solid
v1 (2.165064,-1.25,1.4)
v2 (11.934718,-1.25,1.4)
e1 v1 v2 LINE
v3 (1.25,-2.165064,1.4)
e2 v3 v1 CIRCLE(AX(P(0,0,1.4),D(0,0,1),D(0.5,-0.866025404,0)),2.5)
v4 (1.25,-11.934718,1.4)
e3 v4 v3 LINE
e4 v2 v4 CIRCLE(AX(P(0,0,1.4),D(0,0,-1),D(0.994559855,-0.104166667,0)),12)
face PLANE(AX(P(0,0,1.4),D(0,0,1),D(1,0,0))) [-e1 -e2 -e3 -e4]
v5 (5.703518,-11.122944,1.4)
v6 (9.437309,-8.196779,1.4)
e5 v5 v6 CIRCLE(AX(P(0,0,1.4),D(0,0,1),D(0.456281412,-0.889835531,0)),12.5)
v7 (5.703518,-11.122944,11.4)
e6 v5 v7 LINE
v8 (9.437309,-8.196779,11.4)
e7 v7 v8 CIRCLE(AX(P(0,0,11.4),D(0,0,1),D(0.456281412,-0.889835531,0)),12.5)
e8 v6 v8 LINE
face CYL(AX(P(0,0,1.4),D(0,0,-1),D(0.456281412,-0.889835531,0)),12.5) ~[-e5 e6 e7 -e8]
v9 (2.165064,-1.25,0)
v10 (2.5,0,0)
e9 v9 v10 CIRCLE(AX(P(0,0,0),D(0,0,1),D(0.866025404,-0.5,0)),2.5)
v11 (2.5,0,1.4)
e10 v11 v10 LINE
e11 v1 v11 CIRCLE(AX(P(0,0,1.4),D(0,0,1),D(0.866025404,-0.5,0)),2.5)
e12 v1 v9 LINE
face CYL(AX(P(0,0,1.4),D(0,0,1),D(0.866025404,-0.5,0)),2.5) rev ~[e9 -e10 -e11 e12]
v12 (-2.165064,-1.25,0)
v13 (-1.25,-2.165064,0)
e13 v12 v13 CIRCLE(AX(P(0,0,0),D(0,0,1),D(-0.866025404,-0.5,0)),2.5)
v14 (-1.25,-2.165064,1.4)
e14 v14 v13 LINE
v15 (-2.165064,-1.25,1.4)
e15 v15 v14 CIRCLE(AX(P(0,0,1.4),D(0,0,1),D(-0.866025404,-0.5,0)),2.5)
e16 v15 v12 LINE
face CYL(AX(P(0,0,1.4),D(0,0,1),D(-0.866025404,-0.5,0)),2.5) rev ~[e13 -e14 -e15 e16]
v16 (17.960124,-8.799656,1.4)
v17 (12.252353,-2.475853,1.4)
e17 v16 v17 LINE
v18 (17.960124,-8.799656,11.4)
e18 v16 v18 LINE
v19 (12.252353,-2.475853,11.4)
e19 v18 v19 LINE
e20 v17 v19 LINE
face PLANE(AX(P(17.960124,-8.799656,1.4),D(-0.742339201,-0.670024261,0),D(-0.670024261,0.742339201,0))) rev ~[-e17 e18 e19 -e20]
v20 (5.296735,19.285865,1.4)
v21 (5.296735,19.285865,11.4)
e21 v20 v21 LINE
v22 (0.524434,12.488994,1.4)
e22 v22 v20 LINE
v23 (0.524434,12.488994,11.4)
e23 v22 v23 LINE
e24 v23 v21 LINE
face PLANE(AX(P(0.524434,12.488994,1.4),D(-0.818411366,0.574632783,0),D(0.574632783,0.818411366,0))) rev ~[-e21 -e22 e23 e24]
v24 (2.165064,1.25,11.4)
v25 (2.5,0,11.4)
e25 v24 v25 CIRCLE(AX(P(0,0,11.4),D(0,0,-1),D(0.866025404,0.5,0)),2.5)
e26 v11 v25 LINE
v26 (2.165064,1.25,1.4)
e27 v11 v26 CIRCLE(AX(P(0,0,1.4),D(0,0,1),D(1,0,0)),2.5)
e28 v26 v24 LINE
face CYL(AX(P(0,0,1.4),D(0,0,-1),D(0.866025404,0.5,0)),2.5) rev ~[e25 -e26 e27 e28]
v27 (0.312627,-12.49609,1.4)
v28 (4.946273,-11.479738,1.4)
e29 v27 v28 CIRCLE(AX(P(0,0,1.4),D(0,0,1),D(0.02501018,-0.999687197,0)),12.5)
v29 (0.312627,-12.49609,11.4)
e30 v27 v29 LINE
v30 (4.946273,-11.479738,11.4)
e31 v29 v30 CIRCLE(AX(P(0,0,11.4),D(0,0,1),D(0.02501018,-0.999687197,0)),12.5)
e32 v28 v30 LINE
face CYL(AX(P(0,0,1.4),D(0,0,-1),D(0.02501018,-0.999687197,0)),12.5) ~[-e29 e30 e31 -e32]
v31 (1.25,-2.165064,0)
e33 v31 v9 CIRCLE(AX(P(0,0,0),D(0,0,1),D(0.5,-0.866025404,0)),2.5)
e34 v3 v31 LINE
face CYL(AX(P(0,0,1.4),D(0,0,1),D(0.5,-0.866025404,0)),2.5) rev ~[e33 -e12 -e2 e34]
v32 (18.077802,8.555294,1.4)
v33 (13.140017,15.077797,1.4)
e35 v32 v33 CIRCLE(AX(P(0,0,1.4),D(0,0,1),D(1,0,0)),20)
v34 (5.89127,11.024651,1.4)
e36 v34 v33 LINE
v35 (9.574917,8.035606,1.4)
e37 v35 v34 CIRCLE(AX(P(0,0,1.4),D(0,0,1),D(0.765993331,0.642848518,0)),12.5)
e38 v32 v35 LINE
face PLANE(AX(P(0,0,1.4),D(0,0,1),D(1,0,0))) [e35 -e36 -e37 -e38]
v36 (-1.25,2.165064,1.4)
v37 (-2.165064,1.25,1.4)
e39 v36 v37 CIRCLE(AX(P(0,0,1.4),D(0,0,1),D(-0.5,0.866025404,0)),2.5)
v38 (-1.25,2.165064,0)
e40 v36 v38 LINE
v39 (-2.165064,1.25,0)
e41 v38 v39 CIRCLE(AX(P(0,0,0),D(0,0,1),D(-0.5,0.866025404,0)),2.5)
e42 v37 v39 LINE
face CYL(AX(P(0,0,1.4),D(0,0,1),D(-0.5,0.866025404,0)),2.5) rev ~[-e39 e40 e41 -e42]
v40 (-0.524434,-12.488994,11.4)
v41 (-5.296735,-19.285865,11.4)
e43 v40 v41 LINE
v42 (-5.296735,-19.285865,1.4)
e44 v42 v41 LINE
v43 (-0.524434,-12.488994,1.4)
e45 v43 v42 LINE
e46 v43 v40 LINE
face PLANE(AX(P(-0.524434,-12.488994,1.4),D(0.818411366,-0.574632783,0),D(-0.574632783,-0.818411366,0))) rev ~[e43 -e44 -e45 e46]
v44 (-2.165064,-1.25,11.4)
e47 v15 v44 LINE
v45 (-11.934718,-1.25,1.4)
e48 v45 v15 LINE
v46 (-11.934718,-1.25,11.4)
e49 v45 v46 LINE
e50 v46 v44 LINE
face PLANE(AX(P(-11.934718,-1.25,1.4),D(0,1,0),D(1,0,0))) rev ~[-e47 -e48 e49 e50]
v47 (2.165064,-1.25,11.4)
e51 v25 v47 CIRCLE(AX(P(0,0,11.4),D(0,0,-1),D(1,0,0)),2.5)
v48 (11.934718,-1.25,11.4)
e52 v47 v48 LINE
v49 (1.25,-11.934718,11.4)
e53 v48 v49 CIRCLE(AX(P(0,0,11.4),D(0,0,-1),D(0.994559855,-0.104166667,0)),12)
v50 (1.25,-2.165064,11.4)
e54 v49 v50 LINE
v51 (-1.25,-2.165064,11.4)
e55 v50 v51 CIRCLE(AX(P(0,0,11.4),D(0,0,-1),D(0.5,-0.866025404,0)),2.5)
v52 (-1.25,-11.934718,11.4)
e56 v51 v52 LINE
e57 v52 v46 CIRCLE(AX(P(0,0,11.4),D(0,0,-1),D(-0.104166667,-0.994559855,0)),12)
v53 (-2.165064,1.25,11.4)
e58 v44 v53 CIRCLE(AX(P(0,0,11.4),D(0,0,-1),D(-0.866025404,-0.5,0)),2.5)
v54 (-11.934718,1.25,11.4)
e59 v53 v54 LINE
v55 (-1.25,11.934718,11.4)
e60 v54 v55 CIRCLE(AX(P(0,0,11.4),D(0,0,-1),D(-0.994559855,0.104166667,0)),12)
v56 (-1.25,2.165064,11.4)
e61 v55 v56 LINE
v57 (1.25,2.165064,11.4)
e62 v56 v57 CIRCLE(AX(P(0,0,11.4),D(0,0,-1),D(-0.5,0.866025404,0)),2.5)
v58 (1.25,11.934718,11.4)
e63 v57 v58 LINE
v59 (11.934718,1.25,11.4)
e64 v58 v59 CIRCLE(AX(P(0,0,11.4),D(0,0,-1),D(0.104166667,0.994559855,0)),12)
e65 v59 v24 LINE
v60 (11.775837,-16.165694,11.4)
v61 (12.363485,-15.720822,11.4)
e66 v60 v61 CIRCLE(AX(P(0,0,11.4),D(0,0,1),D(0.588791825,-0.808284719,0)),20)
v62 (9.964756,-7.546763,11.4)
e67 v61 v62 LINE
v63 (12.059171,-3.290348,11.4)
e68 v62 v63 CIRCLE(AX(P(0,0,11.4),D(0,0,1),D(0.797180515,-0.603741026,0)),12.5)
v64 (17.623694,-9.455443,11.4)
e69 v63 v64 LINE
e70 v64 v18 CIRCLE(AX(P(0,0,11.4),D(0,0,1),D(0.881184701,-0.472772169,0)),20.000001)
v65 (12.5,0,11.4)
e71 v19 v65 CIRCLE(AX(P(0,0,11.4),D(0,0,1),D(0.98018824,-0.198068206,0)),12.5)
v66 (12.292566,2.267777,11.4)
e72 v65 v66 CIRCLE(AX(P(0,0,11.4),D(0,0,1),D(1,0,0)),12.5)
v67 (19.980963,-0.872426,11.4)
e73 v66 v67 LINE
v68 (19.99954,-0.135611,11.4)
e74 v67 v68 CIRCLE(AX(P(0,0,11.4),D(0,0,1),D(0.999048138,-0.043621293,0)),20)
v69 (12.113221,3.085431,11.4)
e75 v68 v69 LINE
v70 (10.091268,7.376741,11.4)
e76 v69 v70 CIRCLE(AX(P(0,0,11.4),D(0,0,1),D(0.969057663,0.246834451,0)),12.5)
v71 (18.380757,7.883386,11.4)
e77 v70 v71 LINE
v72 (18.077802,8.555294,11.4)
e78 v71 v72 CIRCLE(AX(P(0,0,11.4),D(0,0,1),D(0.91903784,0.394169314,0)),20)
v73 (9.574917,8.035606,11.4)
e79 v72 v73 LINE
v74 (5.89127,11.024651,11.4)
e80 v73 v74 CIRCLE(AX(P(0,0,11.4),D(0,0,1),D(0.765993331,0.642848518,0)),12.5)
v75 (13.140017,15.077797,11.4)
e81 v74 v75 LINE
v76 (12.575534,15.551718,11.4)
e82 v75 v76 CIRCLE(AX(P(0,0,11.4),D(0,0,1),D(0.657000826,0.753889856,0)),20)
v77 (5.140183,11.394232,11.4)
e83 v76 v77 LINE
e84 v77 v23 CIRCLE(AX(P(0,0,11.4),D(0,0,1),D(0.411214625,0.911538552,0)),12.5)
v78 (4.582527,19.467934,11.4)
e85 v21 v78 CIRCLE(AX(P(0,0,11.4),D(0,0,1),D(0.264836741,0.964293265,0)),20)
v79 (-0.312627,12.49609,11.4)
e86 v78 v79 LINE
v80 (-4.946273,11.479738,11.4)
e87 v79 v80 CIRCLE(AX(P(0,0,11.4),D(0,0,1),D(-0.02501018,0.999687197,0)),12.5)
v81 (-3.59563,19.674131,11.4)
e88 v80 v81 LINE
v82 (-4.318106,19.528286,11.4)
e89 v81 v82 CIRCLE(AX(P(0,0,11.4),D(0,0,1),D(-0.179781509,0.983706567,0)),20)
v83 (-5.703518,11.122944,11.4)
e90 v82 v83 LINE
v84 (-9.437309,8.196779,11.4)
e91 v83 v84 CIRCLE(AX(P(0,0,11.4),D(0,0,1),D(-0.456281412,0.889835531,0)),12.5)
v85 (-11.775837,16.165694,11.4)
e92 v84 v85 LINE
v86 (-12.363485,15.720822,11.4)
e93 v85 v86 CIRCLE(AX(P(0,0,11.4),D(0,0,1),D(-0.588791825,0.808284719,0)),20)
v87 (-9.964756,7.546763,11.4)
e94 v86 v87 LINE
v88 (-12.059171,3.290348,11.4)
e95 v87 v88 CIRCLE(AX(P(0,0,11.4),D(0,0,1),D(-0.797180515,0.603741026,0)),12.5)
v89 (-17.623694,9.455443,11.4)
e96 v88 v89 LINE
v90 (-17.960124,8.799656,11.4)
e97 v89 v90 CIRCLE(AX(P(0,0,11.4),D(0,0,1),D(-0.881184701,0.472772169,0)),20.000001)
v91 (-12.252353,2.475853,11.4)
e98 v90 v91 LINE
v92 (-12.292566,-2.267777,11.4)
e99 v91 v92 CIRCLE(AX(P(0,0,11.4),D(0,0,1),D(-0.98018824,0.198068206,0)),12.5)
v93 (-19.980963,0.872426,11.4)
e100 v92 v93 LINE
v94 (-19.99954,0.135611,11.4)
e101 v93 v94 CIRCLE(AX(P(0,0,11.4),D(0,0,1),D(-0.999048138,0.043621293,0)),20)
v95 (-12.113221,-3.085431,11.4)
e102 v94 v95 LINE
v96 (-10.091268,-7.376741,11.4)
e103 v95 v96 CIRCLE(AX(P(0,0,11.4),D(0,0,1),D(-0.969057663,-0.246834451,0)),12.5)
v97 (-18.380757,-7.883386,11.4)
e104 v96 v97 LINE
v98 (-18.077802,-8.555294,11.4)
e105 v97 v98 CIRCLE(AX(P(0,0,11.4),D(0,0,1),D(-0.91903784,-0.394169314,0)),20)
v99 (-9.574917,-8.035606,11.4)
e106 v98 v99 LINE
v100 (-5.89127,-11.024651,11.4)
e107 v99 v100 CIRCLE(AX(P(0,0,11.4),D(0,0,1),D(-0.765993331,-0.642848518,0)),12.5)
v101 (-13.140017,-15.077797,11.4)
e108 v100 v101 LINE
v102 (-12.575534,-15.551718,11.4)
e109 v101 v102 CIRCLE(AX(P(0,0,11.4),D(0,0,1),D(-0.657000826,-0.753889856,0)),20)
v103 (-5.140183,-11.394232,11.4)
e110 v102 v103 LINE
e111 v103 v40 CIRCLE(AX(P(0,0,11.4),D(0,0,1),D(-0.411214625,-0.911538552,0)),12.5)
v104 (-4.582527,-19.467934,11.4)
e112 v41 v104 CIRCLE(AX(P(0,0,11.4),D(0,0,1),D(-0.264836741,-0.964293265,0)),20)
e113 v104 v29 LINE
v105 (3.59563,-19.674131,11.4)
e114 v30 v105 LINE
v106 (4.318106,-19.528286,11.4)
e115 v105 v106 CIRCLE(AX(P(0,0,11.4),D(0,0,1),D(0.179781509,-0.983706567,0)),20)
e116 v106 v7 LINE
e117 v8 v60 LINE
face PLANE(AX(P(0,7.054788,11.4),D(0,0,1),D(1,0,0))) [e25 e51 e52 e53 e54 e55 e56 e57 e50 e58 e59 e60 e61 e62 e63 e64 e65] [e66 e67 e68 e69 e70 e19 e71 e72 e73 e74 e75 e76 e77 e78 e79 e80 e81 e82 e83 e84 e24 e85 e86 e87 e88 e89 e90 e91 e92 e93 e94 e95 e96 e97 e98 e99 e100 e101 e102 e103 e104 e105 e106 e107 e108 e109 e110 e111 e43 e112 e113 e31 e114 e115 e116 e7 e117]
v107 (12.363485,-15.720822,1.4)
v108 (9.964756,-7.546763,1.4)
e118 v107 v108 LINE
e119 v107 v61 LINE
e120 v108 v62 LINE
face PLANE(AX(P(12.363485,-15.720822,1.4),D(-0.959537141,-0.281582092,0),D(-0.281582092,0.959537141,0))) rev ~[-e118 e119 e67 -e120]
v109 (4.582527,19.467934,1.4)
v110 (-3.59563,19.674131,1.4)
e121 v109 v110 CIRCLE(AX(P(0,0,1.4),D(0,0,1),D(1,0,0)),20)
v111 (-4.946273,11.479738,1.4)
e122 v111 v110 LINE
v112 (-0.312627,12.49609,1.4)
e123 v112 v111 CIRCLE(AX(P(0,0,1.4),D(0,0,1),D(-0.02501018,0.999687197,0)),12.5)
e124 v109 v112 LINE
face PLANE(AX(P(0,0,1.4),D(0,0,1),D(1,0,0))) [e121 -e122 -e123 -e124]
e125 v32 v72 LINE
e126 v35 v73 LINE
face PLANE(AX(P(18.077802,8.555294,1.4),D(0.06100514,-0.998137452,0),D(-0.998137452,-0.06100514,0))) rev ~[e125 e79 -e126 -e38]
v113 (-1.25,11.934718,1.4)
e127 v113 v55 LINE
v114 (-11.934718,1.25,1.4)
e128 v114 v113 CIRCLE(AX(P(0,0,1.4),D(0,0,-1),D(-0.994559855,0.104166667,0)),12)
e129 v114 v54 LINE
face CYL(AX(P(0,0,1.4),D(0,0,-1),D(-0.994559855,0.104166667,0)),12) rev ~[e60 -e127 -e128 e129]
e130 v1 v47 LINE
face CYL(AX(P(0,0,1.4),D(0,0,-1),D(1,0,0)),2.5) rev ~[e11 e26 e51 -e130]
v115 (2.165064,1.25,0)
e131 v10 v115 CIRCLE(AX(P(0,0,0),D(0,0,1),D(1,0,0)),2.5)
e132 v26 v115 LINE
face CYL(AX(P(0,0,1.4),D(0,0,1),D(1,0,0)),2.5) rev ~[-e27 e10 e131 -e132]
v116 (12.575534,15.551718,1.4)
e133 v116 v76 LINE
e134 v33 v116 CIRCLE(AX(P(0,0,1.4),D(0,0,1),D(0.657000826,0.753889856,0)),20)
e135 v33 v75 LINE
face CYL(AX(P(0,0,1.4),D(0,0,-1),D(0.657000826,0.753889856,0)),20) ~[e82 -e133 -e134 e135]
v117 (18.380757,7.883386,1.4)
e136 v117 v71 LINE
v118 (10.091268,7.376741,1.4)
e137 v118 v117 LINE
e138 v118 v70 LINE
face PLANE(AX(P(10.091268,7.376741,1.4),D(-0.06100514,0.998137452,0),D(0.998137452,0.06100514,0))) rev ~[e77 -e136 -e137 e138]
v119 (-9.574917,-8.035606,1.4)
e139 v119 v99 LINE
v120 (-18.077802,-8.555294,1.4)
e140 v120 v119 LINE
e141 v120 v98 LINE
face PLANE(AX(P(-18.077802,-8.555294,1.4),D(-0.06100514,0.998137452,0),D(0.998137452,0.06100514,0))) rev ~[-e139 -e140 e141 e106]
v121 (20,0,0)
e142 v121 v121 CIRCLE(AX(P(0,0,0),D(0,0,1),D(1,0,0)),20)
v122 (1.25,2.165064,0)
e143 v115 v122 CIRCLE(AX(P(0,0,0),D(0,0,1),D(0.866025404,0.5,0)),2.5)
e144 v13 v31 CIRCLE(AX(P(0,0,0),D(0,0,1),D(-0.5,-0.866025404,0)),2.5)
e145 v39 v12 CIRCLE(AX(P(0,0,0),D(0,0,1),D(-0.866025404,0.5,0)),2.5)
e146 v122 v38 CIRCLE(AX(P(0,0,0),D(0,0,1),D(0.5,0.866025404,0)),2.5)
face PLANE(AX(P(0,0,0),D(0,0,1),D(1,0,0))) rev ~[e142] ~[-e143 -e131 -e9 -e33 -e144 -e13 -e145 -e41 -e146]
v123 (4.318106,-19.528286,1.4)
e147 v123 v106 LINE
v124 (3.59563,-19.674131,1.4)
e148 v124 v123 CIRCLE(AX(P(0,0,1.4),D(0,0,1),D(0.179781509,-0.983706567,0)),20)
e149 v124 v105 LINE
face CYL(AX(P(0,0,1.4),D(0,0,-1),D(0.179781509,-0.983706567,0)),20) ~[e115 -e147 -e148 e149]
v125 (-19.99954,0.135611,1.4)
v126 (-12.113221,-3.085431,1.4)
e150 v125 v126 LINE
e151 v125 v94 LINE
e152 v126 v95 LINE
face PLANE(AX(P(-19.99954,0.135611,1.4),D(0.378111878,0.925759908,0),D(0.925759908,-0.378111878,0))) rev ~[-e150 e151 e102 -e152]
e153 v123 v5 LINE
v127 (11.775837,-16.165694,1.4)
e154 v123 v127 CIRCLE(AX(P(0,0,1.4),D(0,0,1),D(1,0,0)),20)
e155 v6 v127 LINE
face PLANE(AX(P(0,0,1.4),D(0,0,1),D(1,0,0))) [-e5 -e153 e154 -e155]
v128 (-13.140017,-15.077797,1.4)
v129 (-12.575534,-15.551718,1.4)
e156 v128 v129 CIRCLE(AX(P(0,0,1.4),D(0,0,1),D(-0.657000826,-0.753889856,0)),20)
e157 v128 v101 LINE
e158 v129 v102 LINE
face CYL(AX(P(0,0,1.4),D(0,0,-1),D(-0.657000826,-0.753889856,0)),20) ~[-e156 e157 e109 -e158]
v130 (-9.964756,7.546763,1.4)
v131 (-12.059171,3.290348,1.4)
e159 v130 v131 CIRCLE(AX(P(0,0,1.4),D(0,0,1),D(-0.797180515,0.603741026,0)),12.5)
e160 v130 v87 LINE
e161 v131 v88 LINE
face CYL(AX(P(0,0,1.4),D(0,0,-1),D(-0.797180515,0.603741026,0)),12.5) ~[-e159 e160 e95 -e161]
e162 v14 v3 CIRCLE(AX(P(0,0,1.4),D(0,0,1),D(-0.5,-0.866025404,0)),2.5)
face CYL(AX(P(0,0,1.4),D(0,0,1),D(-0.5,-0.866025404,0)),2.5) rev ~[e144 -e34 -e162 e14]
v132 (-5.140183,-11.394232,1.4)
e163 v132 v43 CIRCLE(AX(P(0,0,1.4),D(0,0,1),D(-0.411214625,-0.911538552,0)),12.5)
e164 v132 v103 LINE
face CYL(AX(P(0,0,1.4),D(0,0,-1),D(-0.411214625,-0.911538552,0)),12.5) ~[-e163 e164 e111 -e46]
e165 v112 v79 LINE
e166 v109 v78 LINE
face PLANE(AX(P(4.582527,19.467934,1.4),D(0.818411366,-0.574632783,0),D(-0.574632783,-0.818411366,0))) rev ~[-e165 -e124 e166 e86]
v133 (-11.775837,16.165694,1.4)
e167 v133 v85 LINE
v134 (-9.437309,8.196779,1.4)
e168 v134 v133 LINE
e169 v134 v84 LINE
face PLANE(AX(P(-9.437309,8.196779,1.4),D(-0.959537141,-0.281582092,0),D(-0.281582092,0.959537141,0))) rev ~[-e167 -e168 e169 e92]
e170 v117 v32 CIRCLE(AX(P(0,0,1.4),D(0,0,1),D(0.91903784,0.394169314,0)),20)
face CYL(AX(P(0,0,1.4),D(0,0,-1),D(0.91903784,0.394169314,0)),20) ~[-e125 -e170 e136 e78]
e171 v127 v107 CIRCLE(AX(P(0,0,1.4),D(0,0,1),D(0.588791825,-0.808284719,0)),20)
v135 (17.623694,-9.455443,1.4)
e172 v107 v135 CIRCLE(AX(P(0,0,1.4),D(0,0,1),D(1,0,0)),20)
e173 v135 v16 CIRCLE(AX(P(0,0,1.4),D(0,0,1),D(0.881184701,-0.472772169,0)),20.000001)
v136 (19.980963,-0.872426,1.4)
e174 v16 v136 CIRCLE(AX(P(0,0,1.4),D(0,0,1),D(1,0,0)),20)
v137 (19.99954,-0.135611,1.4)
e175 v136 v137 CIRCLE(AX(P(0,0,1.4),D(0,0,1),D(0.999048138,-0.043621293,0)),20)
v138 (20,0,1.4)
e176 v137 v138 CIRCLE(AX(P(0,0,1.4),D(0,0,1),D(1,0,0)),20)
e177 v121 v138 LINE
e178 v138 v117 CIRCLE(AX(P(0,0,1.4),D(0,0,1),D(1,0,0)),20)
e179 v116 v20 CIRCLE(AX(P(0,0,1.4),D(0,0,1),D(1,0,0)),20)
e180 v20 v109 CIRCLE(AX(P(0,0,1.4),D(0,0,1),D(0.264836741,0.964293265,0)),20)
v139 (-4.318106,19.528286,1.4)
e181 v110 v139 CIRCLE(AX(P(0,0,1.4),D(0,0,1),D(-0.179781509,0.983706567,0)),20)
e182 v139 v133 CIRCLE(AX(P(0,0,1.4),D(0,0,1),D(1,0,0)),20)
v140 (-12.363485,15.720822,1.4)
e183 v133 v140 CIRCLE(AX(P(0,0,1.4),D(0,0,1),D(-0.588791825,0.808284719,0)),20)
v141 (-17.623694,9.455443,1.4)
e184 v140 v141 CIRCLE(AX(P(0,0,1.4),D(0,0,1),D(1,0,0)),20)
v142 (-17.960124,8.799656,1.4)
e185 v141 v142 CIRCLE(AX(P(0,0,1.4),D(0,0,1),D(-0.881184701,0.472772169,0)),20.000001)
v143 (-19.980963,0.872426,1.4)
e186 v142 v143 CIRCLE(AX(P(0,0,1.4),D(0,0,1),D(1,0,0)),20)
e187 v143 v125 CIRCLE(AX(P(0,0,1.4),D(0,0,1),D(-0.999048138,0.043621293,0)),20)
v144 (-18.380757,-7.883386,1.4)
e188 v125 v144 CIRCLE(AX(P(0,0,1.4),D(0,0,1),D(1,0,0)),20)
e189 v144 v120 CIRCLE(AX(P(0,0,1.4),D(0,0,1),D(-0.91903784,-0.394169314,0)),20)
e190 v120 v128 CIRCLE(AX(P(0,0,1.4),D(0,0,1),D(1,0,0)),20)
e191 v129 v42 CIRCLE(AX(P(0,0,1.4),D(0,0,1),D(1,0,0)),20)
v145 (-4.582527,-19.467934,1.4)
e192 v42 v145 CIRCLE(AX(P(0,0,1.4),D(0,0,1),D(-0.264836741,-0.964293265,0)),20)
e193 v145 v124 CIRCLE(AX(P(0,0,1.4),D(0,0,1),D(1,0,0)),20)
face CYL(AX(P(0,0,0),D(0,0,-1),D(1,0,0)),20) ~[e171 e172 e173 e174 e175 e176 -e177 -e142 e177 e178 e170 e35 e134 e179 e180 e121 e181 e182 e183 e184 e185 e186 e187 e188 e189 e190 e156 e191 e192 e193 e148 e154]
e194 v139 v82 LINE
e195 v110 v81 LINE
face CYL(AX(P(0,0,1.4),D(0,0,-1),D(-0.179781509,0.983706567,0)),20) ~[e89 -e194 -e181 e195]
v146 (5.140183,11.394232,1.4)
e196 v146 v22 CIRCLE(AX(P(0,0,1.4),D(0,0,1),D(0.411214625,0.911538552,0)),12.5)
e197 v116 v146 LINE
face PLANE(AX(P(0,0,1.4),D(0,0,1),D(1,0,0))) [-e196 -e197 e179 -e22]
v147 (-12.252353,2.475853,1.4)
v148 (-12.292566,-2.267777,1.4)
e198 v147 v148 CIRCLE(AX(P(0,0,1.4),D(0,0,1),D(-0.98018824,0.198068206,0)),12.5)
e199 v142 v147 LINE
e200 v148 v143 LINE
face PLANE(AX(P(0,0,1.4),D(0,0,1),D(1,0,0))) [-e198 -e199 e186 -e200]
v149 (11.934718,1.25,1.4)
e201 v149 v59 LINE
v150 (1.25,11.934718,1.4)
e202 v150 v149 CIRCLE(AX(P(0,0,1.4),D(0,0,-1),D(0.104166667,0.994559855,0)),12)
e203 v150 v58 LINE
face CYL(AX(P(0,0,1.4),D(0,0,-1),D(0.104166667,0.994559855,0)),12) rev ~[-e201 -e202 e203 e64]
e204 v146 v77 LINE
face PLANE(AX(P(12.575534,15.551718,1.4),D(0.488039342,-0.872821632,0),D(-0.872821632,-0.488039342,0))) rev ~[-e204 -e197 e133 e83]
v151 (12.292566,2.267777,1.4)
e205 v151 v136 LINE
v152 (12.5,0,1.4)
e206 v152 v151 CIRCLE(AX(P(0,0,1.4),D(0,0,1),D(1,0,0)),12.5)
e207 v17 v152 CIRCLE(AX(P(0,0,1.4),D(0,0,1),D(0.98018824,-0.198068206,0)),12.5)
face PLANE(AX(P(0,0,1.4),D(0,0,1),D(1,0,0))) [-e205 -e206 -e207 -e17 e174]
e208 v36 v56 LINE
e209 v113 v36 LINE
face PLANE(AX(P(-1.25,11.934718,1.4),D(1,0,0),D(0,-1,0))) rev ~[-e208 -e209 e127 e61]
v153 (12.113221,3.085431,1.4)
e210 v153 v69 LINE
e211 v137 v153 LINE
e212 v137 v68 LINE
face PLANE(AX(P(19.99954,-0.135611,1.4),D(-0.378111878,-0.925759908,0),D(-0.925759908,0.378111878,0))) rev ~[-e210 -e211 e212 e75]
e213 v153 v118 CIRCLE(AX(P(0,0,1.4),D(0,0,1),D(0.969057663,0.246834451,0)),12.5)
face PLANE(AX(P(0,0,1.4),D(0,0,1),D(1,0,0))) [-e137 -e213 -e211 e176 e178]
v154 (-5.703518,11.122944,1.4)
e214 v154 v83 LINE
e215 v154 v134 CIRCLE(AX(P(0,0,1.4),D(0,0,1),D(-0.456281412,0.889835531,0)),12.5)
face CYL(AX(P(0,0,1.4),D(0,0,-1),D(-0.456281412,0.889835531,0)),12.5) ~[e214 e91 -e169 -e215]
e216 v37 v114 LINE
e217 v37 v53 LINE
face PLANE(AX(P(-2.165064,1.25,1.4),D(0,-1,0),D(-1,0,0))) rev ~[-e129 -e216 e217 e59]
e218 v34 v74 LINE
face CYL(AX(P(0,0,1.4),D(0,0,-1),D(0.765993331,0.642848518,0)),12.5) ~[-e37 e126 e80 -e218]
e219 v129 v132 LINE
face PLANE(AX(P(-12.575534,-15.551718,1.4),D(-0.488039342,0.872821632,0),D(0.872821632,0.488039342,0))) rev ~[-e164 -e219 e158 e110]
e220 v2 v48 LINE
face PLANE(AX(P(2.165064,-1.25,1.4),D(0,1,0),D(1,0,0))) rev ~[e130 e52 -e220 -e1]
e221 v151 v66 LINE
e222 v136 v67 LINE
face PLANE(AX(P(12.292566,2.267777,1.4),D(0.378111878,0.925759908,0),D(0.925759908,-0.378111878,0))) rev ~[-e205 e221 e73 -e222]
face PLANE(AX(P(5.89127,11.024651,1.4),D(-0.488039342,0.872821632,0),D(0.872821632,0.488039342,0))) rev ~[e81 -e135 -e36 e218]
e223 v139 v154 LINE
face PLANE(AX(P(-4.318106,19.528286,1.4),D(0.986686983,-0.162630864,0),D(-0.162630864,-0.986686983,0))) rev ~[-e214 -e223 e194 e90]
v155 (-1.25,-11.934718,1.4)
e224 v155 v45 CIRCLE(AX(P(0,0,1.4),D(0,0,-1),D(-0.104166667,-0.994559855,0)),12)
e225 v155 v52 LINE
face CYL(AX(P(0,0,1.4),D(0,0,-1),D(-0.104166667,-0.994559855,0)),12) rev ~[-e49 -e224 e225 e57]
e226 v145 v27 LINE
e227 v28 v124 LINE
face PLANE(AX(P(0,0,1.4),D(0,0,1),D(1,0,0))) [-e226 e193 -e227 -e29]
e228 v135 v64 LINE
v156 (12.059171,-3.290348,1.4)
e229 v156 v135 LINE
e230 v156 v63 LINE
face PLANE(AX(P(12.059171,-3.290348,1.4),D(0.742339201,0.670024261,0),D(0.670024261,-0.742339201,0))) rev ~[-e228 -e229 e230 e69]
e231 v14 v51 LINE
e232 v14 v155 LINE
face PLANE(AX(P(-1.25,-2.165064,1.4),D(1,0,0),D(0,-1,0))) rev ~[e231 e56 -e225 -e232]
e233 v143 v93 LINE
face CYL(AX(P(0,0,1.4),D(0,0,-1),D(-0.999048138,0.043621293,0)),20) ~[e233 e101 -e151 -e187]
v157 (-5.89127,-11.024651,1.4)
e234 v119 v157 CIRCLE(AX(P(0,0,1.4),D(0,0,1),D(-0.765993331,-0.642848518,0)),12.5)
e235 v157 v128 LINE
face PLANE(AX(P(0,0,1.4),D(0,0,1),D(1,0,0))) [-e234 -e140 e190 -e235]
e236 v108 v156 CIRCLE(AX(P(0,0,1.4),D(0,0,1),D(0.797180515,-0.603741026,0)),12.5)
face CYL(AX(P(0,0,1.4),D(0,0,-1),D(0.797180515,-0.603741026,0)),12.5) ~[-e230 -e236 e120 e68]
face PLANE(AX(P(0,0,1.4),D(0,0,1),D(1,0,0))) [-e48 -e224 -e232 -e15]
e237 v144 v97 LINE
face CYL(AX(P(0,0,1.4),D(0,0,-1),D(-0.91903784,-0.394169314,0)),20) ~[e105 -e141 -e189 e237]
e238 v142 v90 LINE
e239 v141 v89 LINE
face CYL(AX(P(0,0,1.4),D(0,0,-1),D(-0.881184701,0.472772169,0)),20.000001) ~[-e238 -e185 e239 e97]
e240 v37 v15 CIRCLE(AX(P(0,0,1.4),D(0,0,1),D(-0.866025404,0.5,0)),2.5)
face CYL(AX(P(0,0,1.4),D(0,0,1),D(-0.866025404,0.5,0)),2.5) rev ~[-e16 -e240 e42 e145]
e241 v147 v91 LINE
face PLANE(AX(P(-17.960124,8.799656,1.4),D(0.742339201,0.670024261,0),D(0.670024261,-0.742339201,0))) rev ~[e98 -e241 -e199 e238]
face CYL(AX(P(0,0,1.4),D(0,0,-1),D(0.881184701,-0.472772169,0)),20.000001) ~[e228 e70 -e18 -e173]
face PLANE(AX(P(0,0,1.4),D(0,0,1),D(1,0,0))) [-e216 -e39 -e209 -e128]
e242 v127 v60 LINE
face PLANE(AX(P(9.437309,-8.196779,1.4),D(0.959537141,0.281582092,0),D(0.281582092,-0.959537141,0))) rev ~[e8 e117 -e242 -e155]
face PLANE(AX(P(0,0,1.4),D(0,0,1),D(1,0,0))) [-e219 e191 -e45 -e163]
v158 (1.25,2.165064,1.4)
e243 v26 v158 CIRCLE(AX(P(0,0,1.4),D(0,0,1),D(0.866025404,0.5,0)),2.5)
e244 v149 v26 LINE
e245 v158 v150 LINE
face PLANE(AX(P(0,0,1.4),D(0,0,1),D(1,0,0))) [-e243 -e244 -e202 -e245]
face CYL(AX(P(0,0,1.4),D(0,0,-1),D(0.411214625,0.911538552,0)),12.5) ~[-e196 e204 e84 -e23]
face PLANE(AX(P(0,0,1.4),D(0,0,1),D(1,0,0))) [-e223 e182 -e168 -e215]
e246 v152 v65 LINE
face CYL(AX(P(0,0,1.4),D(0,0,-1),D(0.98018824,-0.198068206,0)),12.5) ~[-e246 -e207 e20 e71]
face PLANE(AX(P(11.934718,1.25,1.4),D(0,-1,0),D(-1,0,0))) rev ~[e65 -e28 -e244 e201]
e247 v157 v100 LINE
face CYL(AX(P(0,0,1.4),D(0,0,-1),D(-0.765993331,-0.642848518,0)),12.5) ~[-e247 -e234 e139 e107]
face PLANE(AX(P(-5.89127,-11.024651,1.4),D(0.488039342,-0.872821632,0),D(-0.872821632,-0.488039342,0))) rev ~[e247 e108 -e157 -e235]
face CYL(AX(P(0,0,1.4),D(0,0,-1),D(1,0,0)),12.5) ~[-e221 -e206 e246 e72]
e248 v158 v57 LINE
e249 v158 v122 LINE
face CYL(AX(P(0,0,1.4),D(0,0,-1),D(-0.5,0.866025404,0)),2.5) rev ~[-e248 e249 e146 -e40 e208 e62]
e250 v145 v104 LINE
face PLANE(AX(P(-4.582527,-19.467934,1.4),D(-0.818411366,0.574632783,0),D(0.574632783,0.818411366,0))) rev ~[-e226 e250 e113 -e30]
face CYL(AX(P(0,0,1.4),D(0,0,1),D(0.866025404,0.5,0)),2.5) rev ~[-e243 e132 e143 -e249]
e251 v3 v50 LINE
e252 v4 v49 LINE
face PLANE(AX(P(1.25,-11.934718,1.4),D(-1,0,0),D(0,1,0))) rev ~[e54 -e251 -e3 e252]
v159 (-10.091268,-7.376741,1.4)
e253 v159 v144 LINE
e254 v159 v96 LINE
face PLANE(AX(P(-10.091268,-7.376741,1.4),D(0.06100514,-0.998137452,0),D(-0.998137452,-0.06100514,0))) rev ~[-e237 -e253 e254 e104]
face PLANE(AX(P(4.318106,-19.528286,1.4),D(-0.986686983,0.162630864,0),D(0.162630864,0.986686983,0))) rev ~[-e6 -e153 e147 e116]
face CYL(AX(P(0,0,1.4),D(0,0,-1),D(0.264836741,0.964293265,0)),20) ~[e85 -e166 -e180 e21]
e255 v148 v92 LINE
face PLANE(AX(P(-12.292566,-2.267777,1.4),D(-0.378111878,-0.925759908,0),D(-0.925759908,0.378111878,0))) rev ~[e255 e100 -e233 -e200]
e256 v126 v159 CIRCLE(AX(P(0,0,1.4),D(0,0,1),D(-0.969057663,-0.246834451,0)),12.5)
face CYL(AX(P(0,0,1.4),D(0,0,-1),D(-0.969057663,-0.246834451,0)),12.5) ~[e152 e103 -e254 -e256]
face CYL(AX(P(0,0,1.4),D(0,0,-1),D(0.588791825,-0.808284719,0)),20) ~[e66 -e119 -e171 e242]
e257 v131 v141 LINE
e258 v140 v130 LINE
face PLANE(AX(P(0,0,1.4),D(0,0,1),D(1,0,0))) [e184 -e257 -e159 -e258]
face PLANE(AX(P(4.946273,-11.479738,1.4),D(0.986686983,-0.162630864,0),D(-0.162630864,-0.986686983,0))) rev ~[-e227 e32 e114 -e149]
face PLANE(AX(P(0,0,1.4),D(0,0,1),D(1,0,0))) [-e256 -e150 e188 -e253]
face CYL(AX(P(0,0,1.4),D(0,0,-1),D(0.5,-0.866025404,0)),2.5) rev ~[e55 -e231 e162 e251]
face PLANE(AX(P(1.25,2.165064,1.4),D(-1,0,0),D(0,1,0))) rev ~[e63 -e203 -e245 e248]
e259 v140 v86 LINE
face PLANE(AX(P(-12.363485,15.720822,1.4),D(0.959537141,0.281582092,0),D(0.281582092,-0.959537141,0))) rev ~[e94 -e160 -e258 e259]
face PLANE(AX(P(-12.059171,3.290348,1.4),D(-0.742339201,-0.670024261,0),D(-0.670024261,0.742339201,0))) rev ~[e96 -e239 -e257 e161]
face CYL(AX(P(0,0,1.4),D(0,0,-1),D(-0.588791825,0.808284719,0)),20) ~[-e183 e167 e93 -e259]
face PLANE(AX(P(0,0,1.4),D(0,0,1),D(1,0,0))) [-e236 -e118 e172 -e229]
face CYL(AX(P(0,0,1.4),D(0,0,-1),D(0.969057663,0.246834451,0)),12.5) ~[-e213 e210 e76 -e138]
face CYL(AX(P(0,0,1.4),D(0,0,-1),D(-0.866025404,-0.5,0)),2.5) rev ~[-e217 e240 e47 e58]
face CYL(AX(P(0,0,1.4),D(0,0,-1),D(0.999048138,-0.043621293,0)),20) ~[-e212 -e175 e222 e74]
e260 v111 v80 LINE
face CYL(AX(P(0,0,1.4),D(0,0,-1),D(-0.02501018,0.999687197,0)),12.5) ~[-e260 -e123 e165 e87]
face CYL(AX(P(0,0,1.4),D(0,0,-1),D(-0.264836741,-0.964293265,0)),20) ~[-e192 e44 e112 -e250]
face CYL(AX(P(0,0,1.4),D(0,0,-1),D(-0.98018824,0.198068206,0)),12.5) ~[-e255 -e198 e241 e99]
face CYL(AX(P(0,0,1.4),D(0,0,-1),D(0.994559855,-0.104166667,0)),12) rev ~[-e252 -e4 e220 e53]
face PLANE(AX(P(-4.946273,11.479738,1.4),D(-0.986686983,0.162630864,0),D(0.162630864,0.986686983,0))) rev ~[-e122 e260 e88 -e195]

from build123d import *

# Parameters (mm, degrees)
F0_R     = 20
F1_DEPTH = 1.4
F3_DEPTH = 10
F4_DEPTH = 10
F5_DEPTH = 25.4
F6_DEPTH = 10


# Not quite as in the source:
# - after a boolean that leaves OpenCascade's solid faulty, fix() repairs it


with BuildPart() as f1:
    # F0 (on Top) → F1 (new body)
    with BuildSketch(Plane.XY):
        Circle(F0_R)
    extrude(amount=F1_DEPTH)

    # F2 (on face) → F3 (join)
    with BuildSketch(Plane.XY.offset(1.4)):
        with BuildLine():
            ThreePointArc((-5.7035176523, 11.1229441422), (-5.3278826262, 11.3076817572), (-4.9462725406, 11.4797381483))
            Line((-4.9462725406, 11.4797381483), (-3.5956301682, 19.6741313326))
            ThreePointArc((-3.5956301682, 19.6741313326), (-3.9575397764, 19.6045372023), (-4.3181055831, 19.528286258))
            Line((-4.3181055831, 19.528286258), (-5.7035176523, 11.1229441422))
        make_face()
        with BuildLine():
            ThreePointArc((-0.3126272478, 12.4960899566), (0.1059628635, 12.4995508668), (0.5244341406, 12.4889939079))
            Line((0.5244341406, 12.4889939079), (5.2967348245, 19.2858652956))
            ThreePointArc((5.2967348245, 19.2858652956), (4.940469773, 19.3801898448), (4.5825271615, 19.4679337582))
            Line((4.5825271615, 19.4679337582), (-0.3126272478, 12.4960899566))
        make_face()
        with BuildLine():
            ThreePointArc((5.1401828172, 11.3942319007), (5.5188211085, 11.2157306303), (5.8912702085, 11.0246512566))
            Line((5.8912702085, 11.0246512566), (13.140016525, 15.0777971111))
            ThreePointArc((13.140016525, 15.0777971111), (12.859958693, 15.3173582061), (12.5755342007, 15.5517182191))
            Line((12.5755342007, 15.5517182191), (5.1401828172, 11.3942319007))
        make_face()
        with BuildLine():
            ThreePointArc((9.574916635, 8.0356064757), (9.8386091491, 7.7104973906), (10.09126796, 7.3767412155))
            Line((10.09126796, 7.3767412155), (18.3807568009, 7.8833862917))
            ThreePointArc((18.3807568009, 7.8833862917), (18.2323750768, 8.2207359196), (18.0778024627, 8.5552941574))
            Line((18.0778024627, 8.5552941574), (9.574916635, 8.0356064757))
        make_face()
        with BuildLine():
            ThreePointArc((12.1132207847, 3.085430638), (12.2097399851, 2.6781055797), (12.2925663307, 2.2677771068))
            Line((12.2925663307, 2.2677771068), (19.9809627673, -0.8724258661))
            ThreePointArc((19.9809627673, -0.8724258661), (19.9936459712, -0.5041039365), (19.9995402372, -0.135610836))
            Line((19.9995402372, -0.135610836), (12.1132207847, 3.085430638))
        make_face()
        with BuildLine():
            Line((17.9601237896, -8.7996564401), (12.252352999, -2.4758525779))
            ThreePointArc((12.252352999, -2.4758525779), (12.1625820744, -2.8847178862), (12.0591711811, -3.2903480703))
            Line((12.0591711811, -3.2903480703), (17.6236940072, -9.4554433816))
            ThreePointArc((17.6236940072, -9.4554433816), (17.794930075, -9.1290998255), (17.9601237896, -8.7996564401))
        make_face()
        with BuildLine():
            Line((12.3634845589, -15.7208221656), (9.9647564366, -7.5467628264))
            ThreePointArc((9.9647564366, -7.5467628264), (9.7064756196, -7.8761875959), (9.4373092832, -8.1967794587))
            Line((9.4373092832, -8.1967794587), (11.7758365085, -16.1656943719))
            ThreePointArc((11.7758365085, -16.1656943719), (12.071710037, -15.9459655331), (12.3634845589, -15.7208221656))
        make_face()
        with BuildLine():
            Line((4.3181055831, -19.528286258), (5.7035176523, -11.1229441422))
            ThreePointArc((5.7035176523, -11.1229441422), (5.3278826262, -11.3076817572), (4.9462725406, -11.4797381483))
            Line((4.9462725406, -11.4797381483), (3.5956301682, -19.6741313326))
            ThreePointArc((3.5956301682, -19.6741313326), (3.9575397764, -19.6045372023), (4.3181055831, -19.528286258))
        make_face()
        with BuildLine():
            Line((-4.5825271615, -19.4679337582), (0.3126272478, -12.4960899566))
            ThreePointArc((0.3126272478, -12.4960899566), (-0.1059628635, -12.4995508668), (-0.5244341406, -12.4889939079))
            Line((-0.5244341406, -12.4889939079), (-5.2967348245, -19.2858652956))
            ThreePointArc((-5.2967348245, -19.2858652956), (-4.940469773, -19.3801898448), (-4.5825271615, -19.4679337582))
        make_face()
        with BuildLine():
            Line((-12.5755342007, -15.5517182191), (-5.1401828172, -11.3942319007))
            ThreePointArc((-5.1401828172, -11.3942319007), (-5.5188211085, -11.2157306303), (-5.8912702085, -11.0246512566))
            Line((-5.8912702085, -11.0246512566), (-13.140016525, -15.0777971111))
            ThreePointArc((-13.140016525, -15.0777971111), (-12.859958693, -15.3173582061), (-12.5755342007, -15.5517182191))
        make_face()
        with BuildLine():
            Line((-18.0778024627, -8.5552941574), (-9.574916635, -8.0356064757))
            ThreePointArc((-9.574916635, -8.0356064757), (-9.8386091491, -7.7104973906), (-10.09126796, -7.3767412155))
            Line((-10.09126796, -7.3767412155), (-18.3807568009, -7.8833862917))
            ThreePointArc((-18.3807568009, -7.8833862917), (-18.2323750768, -8.2207359196), (-18.0778024627, -8.5552941574))
        make_face()
        with BuildLine():
            Line((-19.9995402372, 0.135610836), (-12.1132207847, -3.085430638))
            ThreePointArc((-12.1132207847, -3.085430638), (-12.2097399851, -2.6781055797), (-12.2925663307, -2.2677771068))
            Line((-12.2925663307, -2.2677771068), (-19.9809627673, 0.8724258661))
            ThreePointArc((-19.9809627673, 0.8724258661), (-19.9936459712, 0.5041039365), (-19.9995402372, 0.135610836))
        make_face()
        with BuildLine():
            ThreePointArc((-12.252352999, 2.4758525779), (-12.1625820744, 2.8847178862), (-12.0591711811, 3.2903480703))
            Line((-12.0591711811, 3.2903480703), (-17.6236940072, 9.4554433816))
            ThreePointArc((-17.6236940072, 9.4554433816), (-17.794930075, 9.1290998255), (-17.9601237896, 8.7996564401))
            Line((-17.9601237896, 8.7996564401), (-12.252352999, 2.4758525779))
        make_face()
        with BuildLine():
            ThreePointArc((-9.9647564366, 7.5467628264), (-9.7064756196, 7.8761875959), (-9.4373092832, 8.1967794587))
            Line((-9.4373092832, 8.1967794587), (-11.7758365085, 16.1656943719))
            ThreePointArc((-11.7758365085, 16.1656943719), (-12.071710037, 15.9459655331), (-12.3634845589, 15.7208221656))
            Line((-12.3634845589, 15.7208221656), (-9.9647564366, 7.5467628264))
        make_face()
    extrude(amount=F3_DEPTH)

    # F2 (on face) → F4 (join)
    with BuildSketch(Plane.XY.offset(1.4)):
        with BuildLine():
            ThreePointArc((12.252352999, -2.4758525779), (12.437934163, -1.2441035954), (12.5, 0))
            ThreePointArc((12.5, 0), (12.4480335622, 1.1386221644), (12.2925663307, 2.2677771068))
            ThreePointArc((12.2925663307, 2.2677771068), (12.2097399851, 2.6781055797), (12.1132207847, 3.085430638))
            ThreePointArc((12.1132207847, 3.085430638), (11.3076817572, 5.3278826262), (10.09126796, 7.3767412155))
            ThreePointArc((10.09126796, 7.3767412155), (9.8386091491, 7.7104973906), (9.574916635, 8.0356064757))
            ThreePointArc((9.574916635, 8.0356064757), (7.8761875959, 9.7064756196), (5.8912702085, 11.0246512566))
            ThreePointArc((5.8912702085, 11.0246512566), (5.5188211085, 11.2157306303), (5.1401828172, 11.3942319007))
            ThreePointArc((5.1401828172, 11.3942319007), (2.8847178862, 12.1625820744), (0.5244341406, 12.4889939079))
            ThreePointArc((0.5244341406, 12.4889939079), (0.1059628635, 12.4995508668), (-0.3126272478, 12.4960899566))
            ThreePointArc((-0.3126272478, 12.4960899566), (-2.6781055797, 12.2097399851), (-4.9462725406, 11.4797381483))
            ThreePointArc((-4.9462725406, 11.4797381483), (-5.3278826262, 11.3076817572), (-5.7035176523, 11.1229441422))
            ThreePointArc((-5.7035176523, 11.1229441422), (-7.7104973906, 9.8386091491), (-9.4373092832, 8.1967794587))
            ThreePointArc((-9.4373092832, 8.1967794587), (-9.7064756196, 7.8761875959), (-9.9647564366, 7.5467628264))
            ThreePointArc((-9.9647564366, 7.5467628264), (-11.2157306303, 5.5188211085), (-12.0591711811, 3.2903480703))
            ThreePointArc((-12.0591711811, 3.2903480703), (-12.1625820744, 2.8847178862), (-12.252352999, 2.4758525779))
            ThreePointArc((-12.252352999, 2.4758525779), (-12.4995508668, 0.1059628635), (-12.2925663307, -2.2677771068))
            ThreePointArc((-12.2925663307, -2.2677771068), (-12.2097399851, -2.6781055797), (-12.1132207847, -3.085430638))
            ThreePointArc((-12.1132207847, -3.085430638), (-11.3076817572, -5.3278826262), (-10.09126796, -7.3767412155))
            ThreePointArc((-10.09126796, -7.3767412155), (-9.8386091491, -7.7104973906), (-9.574916635, -8.0356064757))
            ThreePointArc((-9.574916635, -8.0356064757), (-7.8761875959, -9.7064756196), (-5.8912702085, -11.0246512566))
            ThreePointArc((-5.8912702085, -11.0246512566), (-5.5188211085, -11.2157306303), (-5.1401828172, -11.3942319007))
            ThreePointArc((-5.1401828172, -11.3942319007), (-2.8847178862, -12.1625820744), (-0.5244341406, -12.4889939079))
            ThreePointArc((-0.5244341406, -12.4889939079), (-0.1059628635, -12.4995508668), (0.3126272478, -12.4960899566))
            ThreePointArc((0.3126272478, -12.4960899566), (2.6781055797, -12.2097399851), (4.9462725406, -11.4797381483))
            ThreePointArc((4.9462725406, -11.4797381483), (5.3278826262, -11.3076817572), (5.7035176523, -11.1229441422))
            ThreePointArc((5.7035176523, -11.1229441422), (7.7104973906, -9.8386091491), (9.4373092832, -8.1967794587))
            ThreePointArc((9.4373092832, -8.1967794587), (9.7064756196, -7.8761875959), (9.9647564366, -7.5467628264))
            ThreePointArc((9.9647564366, -7.5467628264), (11.2157306303, -5.5188211085), (12.0591711811, -3.2903480703))
            ThreePointArc((12.0591711811, -3.2903480703), (12.1625820744, -2.8847178862), (12.252352999, -2.4758525779))
        make_face()
        with BuildLine():
            ThreePointArc((11.9347182623, 1.25), (11.9836684523, 0.6258517607), (12, 0))
            ThreePointArc((12, 0), (11.9836684523, -0.6258517607), (11.9347182623, -1.25))
            ThreePointArc((11.9347182623, -1.25), (8.4852813742, -8.4852813742), (1.25, -11.9347182623))
            ThreePointArc((1.25, -11.9347182623), (0, -12), (-1.25, -11.9347182623))
            ThreePointArc((-1.25, -11.9347182623), (-8.4852813742, -8.4852813742), (-11.9347182623, -1.25))
            ThreePointArc((-11.9347182623, -1.25), (-12, 0), (-11.9347182623, 1.25))
            ThreePointArc((-11.9347182623, 1.25), (-8.4852813742, 8.4852813742), (-1.25, 11.9347182623))
            ThreePointArc((-1.25, 11.9347182623), (0, 12), (1.25, 11.9347182623))
            ThreePointArc((1.25, 11.9347182623), (8.4852813742, 8.4852813742), (11.9347182623, 1.25))
        make_face(mode=Mode.SUBTRACT)
    extrude(amount=F4_DEPTH)

    # F2 (on face) → F5 (cut)
    with BuildSketch(Plane.XY.offset(1.4)):
        with BuildLine():
            ThreePointArc((2.5, 0), (2.4148145657, 0.6470476128), (2.1650635095, 1.25))
            ThreePointArc((2.1650635095, 1.25), (1.767766953, 1.767766953), (1.25, 2.1650635095))
            ThreePointArc((1.25, 2.1650635095), (0, 2.5), (-1.25, 2.1650635095))
            ThreePointArc((-1.25, 2.1650635095), (-1.767766953, 1.767766953), (-2.1650635095, 1.25))
            ThreePointArc((-2.1650635095, 1.25), (-2.5, 0), (-2.1650635095, -1.25))
            ThreePointArc((-2.1650635095, -1.25), (-1.767766953, -1.767766953), (-1.25, -2.1650635095))
            ThreePointArc((-1.25, -2.1650635095), (0, -2.5), (1.25, -2.1650635095))
            ThreePointArc((1.25, -2.1650635095), (1.767766953, -1.767766953), (2.1650635095, -1.25))
            ThreePointArc((2.1650635095, -1.25), (2.4148145657, -0.6470476128), (2.5, 0))
        make_face()
    extrude(amount=-F5_DEPTH, mode=Mode.SUBTRACT)

    # F2 (on face) → F6 (join)
    with BuildSketch(Plane.XY.offset(1.4)):
        with BuildLine():
            Line((1.25, 2.1650635095), (1.25, 11.9347182623))
            ThreePointArc((1.25, 11.9347182623), (0, 12), (-1.25, 11.9347182623))
            Line((-1.25, 11.9347182623), (-1.25, 2.1650635095))
            ThreePointArc((-1.25, 2.1650635095), (0, 2.5), (1.25, 2.1650635095))
        make_face()
        with BuildLine():
            ThreePointArc((11.9347182623, -1.25), (11.9836684523, -0.6258517607), (12, 0))
            ThreePointArc((12, 0), (11.9836684523, 0.6258517607), (11.9347182623, 1.25))
            Line((11.9347182623, 1.25), (2.1650635095, 1.25))
            ThreePointArc((2.1650635095, 1.25), (2.4148145657, 0.6470476128), (2.5, 0))
            ThreePointArc((2.5, 0), (2.4148145657, -0.6470476128), (2.1650635095, -1.25))
            Line((2.1650635095, -1.25), (11.9347182623, -1.25))
        make_face()
        with BuildLine():
            ThreePointArc((-1.25, -11.9347182623), (0, -12), (1.25, -11.9347182623))
            Line((1.25, -11.9347182623), (1.25, -2.1650635095))
            ThreePointArc((1.25, -2.1650635095), (0, -2.5), (-1.25, -2.1650635095))
            Line((-1.25, -2.1650635095), (-1.25, -11.9347182623))
        make_face()
        with BuildLine():
            Line((-2.1650635095, 1.25), (-11.9347182623, 1.25))
            ThreePointArc((-11.9347182623, 1.25), (-12, 0), (-11.9347182623, -1.25))
            Line((-11.9347182623, -1.25), (-2.1650635095, -1.25))
            ThreePointArc((-2.1650635095, -1.25), (-2.5, 0), (-2.1650635095, 1.25))
        make_face()
    extrude(amount=F6_DEPTH)

    add(f1.part.fix(), mode=Mode.REPLACE)


solid = f1.part
